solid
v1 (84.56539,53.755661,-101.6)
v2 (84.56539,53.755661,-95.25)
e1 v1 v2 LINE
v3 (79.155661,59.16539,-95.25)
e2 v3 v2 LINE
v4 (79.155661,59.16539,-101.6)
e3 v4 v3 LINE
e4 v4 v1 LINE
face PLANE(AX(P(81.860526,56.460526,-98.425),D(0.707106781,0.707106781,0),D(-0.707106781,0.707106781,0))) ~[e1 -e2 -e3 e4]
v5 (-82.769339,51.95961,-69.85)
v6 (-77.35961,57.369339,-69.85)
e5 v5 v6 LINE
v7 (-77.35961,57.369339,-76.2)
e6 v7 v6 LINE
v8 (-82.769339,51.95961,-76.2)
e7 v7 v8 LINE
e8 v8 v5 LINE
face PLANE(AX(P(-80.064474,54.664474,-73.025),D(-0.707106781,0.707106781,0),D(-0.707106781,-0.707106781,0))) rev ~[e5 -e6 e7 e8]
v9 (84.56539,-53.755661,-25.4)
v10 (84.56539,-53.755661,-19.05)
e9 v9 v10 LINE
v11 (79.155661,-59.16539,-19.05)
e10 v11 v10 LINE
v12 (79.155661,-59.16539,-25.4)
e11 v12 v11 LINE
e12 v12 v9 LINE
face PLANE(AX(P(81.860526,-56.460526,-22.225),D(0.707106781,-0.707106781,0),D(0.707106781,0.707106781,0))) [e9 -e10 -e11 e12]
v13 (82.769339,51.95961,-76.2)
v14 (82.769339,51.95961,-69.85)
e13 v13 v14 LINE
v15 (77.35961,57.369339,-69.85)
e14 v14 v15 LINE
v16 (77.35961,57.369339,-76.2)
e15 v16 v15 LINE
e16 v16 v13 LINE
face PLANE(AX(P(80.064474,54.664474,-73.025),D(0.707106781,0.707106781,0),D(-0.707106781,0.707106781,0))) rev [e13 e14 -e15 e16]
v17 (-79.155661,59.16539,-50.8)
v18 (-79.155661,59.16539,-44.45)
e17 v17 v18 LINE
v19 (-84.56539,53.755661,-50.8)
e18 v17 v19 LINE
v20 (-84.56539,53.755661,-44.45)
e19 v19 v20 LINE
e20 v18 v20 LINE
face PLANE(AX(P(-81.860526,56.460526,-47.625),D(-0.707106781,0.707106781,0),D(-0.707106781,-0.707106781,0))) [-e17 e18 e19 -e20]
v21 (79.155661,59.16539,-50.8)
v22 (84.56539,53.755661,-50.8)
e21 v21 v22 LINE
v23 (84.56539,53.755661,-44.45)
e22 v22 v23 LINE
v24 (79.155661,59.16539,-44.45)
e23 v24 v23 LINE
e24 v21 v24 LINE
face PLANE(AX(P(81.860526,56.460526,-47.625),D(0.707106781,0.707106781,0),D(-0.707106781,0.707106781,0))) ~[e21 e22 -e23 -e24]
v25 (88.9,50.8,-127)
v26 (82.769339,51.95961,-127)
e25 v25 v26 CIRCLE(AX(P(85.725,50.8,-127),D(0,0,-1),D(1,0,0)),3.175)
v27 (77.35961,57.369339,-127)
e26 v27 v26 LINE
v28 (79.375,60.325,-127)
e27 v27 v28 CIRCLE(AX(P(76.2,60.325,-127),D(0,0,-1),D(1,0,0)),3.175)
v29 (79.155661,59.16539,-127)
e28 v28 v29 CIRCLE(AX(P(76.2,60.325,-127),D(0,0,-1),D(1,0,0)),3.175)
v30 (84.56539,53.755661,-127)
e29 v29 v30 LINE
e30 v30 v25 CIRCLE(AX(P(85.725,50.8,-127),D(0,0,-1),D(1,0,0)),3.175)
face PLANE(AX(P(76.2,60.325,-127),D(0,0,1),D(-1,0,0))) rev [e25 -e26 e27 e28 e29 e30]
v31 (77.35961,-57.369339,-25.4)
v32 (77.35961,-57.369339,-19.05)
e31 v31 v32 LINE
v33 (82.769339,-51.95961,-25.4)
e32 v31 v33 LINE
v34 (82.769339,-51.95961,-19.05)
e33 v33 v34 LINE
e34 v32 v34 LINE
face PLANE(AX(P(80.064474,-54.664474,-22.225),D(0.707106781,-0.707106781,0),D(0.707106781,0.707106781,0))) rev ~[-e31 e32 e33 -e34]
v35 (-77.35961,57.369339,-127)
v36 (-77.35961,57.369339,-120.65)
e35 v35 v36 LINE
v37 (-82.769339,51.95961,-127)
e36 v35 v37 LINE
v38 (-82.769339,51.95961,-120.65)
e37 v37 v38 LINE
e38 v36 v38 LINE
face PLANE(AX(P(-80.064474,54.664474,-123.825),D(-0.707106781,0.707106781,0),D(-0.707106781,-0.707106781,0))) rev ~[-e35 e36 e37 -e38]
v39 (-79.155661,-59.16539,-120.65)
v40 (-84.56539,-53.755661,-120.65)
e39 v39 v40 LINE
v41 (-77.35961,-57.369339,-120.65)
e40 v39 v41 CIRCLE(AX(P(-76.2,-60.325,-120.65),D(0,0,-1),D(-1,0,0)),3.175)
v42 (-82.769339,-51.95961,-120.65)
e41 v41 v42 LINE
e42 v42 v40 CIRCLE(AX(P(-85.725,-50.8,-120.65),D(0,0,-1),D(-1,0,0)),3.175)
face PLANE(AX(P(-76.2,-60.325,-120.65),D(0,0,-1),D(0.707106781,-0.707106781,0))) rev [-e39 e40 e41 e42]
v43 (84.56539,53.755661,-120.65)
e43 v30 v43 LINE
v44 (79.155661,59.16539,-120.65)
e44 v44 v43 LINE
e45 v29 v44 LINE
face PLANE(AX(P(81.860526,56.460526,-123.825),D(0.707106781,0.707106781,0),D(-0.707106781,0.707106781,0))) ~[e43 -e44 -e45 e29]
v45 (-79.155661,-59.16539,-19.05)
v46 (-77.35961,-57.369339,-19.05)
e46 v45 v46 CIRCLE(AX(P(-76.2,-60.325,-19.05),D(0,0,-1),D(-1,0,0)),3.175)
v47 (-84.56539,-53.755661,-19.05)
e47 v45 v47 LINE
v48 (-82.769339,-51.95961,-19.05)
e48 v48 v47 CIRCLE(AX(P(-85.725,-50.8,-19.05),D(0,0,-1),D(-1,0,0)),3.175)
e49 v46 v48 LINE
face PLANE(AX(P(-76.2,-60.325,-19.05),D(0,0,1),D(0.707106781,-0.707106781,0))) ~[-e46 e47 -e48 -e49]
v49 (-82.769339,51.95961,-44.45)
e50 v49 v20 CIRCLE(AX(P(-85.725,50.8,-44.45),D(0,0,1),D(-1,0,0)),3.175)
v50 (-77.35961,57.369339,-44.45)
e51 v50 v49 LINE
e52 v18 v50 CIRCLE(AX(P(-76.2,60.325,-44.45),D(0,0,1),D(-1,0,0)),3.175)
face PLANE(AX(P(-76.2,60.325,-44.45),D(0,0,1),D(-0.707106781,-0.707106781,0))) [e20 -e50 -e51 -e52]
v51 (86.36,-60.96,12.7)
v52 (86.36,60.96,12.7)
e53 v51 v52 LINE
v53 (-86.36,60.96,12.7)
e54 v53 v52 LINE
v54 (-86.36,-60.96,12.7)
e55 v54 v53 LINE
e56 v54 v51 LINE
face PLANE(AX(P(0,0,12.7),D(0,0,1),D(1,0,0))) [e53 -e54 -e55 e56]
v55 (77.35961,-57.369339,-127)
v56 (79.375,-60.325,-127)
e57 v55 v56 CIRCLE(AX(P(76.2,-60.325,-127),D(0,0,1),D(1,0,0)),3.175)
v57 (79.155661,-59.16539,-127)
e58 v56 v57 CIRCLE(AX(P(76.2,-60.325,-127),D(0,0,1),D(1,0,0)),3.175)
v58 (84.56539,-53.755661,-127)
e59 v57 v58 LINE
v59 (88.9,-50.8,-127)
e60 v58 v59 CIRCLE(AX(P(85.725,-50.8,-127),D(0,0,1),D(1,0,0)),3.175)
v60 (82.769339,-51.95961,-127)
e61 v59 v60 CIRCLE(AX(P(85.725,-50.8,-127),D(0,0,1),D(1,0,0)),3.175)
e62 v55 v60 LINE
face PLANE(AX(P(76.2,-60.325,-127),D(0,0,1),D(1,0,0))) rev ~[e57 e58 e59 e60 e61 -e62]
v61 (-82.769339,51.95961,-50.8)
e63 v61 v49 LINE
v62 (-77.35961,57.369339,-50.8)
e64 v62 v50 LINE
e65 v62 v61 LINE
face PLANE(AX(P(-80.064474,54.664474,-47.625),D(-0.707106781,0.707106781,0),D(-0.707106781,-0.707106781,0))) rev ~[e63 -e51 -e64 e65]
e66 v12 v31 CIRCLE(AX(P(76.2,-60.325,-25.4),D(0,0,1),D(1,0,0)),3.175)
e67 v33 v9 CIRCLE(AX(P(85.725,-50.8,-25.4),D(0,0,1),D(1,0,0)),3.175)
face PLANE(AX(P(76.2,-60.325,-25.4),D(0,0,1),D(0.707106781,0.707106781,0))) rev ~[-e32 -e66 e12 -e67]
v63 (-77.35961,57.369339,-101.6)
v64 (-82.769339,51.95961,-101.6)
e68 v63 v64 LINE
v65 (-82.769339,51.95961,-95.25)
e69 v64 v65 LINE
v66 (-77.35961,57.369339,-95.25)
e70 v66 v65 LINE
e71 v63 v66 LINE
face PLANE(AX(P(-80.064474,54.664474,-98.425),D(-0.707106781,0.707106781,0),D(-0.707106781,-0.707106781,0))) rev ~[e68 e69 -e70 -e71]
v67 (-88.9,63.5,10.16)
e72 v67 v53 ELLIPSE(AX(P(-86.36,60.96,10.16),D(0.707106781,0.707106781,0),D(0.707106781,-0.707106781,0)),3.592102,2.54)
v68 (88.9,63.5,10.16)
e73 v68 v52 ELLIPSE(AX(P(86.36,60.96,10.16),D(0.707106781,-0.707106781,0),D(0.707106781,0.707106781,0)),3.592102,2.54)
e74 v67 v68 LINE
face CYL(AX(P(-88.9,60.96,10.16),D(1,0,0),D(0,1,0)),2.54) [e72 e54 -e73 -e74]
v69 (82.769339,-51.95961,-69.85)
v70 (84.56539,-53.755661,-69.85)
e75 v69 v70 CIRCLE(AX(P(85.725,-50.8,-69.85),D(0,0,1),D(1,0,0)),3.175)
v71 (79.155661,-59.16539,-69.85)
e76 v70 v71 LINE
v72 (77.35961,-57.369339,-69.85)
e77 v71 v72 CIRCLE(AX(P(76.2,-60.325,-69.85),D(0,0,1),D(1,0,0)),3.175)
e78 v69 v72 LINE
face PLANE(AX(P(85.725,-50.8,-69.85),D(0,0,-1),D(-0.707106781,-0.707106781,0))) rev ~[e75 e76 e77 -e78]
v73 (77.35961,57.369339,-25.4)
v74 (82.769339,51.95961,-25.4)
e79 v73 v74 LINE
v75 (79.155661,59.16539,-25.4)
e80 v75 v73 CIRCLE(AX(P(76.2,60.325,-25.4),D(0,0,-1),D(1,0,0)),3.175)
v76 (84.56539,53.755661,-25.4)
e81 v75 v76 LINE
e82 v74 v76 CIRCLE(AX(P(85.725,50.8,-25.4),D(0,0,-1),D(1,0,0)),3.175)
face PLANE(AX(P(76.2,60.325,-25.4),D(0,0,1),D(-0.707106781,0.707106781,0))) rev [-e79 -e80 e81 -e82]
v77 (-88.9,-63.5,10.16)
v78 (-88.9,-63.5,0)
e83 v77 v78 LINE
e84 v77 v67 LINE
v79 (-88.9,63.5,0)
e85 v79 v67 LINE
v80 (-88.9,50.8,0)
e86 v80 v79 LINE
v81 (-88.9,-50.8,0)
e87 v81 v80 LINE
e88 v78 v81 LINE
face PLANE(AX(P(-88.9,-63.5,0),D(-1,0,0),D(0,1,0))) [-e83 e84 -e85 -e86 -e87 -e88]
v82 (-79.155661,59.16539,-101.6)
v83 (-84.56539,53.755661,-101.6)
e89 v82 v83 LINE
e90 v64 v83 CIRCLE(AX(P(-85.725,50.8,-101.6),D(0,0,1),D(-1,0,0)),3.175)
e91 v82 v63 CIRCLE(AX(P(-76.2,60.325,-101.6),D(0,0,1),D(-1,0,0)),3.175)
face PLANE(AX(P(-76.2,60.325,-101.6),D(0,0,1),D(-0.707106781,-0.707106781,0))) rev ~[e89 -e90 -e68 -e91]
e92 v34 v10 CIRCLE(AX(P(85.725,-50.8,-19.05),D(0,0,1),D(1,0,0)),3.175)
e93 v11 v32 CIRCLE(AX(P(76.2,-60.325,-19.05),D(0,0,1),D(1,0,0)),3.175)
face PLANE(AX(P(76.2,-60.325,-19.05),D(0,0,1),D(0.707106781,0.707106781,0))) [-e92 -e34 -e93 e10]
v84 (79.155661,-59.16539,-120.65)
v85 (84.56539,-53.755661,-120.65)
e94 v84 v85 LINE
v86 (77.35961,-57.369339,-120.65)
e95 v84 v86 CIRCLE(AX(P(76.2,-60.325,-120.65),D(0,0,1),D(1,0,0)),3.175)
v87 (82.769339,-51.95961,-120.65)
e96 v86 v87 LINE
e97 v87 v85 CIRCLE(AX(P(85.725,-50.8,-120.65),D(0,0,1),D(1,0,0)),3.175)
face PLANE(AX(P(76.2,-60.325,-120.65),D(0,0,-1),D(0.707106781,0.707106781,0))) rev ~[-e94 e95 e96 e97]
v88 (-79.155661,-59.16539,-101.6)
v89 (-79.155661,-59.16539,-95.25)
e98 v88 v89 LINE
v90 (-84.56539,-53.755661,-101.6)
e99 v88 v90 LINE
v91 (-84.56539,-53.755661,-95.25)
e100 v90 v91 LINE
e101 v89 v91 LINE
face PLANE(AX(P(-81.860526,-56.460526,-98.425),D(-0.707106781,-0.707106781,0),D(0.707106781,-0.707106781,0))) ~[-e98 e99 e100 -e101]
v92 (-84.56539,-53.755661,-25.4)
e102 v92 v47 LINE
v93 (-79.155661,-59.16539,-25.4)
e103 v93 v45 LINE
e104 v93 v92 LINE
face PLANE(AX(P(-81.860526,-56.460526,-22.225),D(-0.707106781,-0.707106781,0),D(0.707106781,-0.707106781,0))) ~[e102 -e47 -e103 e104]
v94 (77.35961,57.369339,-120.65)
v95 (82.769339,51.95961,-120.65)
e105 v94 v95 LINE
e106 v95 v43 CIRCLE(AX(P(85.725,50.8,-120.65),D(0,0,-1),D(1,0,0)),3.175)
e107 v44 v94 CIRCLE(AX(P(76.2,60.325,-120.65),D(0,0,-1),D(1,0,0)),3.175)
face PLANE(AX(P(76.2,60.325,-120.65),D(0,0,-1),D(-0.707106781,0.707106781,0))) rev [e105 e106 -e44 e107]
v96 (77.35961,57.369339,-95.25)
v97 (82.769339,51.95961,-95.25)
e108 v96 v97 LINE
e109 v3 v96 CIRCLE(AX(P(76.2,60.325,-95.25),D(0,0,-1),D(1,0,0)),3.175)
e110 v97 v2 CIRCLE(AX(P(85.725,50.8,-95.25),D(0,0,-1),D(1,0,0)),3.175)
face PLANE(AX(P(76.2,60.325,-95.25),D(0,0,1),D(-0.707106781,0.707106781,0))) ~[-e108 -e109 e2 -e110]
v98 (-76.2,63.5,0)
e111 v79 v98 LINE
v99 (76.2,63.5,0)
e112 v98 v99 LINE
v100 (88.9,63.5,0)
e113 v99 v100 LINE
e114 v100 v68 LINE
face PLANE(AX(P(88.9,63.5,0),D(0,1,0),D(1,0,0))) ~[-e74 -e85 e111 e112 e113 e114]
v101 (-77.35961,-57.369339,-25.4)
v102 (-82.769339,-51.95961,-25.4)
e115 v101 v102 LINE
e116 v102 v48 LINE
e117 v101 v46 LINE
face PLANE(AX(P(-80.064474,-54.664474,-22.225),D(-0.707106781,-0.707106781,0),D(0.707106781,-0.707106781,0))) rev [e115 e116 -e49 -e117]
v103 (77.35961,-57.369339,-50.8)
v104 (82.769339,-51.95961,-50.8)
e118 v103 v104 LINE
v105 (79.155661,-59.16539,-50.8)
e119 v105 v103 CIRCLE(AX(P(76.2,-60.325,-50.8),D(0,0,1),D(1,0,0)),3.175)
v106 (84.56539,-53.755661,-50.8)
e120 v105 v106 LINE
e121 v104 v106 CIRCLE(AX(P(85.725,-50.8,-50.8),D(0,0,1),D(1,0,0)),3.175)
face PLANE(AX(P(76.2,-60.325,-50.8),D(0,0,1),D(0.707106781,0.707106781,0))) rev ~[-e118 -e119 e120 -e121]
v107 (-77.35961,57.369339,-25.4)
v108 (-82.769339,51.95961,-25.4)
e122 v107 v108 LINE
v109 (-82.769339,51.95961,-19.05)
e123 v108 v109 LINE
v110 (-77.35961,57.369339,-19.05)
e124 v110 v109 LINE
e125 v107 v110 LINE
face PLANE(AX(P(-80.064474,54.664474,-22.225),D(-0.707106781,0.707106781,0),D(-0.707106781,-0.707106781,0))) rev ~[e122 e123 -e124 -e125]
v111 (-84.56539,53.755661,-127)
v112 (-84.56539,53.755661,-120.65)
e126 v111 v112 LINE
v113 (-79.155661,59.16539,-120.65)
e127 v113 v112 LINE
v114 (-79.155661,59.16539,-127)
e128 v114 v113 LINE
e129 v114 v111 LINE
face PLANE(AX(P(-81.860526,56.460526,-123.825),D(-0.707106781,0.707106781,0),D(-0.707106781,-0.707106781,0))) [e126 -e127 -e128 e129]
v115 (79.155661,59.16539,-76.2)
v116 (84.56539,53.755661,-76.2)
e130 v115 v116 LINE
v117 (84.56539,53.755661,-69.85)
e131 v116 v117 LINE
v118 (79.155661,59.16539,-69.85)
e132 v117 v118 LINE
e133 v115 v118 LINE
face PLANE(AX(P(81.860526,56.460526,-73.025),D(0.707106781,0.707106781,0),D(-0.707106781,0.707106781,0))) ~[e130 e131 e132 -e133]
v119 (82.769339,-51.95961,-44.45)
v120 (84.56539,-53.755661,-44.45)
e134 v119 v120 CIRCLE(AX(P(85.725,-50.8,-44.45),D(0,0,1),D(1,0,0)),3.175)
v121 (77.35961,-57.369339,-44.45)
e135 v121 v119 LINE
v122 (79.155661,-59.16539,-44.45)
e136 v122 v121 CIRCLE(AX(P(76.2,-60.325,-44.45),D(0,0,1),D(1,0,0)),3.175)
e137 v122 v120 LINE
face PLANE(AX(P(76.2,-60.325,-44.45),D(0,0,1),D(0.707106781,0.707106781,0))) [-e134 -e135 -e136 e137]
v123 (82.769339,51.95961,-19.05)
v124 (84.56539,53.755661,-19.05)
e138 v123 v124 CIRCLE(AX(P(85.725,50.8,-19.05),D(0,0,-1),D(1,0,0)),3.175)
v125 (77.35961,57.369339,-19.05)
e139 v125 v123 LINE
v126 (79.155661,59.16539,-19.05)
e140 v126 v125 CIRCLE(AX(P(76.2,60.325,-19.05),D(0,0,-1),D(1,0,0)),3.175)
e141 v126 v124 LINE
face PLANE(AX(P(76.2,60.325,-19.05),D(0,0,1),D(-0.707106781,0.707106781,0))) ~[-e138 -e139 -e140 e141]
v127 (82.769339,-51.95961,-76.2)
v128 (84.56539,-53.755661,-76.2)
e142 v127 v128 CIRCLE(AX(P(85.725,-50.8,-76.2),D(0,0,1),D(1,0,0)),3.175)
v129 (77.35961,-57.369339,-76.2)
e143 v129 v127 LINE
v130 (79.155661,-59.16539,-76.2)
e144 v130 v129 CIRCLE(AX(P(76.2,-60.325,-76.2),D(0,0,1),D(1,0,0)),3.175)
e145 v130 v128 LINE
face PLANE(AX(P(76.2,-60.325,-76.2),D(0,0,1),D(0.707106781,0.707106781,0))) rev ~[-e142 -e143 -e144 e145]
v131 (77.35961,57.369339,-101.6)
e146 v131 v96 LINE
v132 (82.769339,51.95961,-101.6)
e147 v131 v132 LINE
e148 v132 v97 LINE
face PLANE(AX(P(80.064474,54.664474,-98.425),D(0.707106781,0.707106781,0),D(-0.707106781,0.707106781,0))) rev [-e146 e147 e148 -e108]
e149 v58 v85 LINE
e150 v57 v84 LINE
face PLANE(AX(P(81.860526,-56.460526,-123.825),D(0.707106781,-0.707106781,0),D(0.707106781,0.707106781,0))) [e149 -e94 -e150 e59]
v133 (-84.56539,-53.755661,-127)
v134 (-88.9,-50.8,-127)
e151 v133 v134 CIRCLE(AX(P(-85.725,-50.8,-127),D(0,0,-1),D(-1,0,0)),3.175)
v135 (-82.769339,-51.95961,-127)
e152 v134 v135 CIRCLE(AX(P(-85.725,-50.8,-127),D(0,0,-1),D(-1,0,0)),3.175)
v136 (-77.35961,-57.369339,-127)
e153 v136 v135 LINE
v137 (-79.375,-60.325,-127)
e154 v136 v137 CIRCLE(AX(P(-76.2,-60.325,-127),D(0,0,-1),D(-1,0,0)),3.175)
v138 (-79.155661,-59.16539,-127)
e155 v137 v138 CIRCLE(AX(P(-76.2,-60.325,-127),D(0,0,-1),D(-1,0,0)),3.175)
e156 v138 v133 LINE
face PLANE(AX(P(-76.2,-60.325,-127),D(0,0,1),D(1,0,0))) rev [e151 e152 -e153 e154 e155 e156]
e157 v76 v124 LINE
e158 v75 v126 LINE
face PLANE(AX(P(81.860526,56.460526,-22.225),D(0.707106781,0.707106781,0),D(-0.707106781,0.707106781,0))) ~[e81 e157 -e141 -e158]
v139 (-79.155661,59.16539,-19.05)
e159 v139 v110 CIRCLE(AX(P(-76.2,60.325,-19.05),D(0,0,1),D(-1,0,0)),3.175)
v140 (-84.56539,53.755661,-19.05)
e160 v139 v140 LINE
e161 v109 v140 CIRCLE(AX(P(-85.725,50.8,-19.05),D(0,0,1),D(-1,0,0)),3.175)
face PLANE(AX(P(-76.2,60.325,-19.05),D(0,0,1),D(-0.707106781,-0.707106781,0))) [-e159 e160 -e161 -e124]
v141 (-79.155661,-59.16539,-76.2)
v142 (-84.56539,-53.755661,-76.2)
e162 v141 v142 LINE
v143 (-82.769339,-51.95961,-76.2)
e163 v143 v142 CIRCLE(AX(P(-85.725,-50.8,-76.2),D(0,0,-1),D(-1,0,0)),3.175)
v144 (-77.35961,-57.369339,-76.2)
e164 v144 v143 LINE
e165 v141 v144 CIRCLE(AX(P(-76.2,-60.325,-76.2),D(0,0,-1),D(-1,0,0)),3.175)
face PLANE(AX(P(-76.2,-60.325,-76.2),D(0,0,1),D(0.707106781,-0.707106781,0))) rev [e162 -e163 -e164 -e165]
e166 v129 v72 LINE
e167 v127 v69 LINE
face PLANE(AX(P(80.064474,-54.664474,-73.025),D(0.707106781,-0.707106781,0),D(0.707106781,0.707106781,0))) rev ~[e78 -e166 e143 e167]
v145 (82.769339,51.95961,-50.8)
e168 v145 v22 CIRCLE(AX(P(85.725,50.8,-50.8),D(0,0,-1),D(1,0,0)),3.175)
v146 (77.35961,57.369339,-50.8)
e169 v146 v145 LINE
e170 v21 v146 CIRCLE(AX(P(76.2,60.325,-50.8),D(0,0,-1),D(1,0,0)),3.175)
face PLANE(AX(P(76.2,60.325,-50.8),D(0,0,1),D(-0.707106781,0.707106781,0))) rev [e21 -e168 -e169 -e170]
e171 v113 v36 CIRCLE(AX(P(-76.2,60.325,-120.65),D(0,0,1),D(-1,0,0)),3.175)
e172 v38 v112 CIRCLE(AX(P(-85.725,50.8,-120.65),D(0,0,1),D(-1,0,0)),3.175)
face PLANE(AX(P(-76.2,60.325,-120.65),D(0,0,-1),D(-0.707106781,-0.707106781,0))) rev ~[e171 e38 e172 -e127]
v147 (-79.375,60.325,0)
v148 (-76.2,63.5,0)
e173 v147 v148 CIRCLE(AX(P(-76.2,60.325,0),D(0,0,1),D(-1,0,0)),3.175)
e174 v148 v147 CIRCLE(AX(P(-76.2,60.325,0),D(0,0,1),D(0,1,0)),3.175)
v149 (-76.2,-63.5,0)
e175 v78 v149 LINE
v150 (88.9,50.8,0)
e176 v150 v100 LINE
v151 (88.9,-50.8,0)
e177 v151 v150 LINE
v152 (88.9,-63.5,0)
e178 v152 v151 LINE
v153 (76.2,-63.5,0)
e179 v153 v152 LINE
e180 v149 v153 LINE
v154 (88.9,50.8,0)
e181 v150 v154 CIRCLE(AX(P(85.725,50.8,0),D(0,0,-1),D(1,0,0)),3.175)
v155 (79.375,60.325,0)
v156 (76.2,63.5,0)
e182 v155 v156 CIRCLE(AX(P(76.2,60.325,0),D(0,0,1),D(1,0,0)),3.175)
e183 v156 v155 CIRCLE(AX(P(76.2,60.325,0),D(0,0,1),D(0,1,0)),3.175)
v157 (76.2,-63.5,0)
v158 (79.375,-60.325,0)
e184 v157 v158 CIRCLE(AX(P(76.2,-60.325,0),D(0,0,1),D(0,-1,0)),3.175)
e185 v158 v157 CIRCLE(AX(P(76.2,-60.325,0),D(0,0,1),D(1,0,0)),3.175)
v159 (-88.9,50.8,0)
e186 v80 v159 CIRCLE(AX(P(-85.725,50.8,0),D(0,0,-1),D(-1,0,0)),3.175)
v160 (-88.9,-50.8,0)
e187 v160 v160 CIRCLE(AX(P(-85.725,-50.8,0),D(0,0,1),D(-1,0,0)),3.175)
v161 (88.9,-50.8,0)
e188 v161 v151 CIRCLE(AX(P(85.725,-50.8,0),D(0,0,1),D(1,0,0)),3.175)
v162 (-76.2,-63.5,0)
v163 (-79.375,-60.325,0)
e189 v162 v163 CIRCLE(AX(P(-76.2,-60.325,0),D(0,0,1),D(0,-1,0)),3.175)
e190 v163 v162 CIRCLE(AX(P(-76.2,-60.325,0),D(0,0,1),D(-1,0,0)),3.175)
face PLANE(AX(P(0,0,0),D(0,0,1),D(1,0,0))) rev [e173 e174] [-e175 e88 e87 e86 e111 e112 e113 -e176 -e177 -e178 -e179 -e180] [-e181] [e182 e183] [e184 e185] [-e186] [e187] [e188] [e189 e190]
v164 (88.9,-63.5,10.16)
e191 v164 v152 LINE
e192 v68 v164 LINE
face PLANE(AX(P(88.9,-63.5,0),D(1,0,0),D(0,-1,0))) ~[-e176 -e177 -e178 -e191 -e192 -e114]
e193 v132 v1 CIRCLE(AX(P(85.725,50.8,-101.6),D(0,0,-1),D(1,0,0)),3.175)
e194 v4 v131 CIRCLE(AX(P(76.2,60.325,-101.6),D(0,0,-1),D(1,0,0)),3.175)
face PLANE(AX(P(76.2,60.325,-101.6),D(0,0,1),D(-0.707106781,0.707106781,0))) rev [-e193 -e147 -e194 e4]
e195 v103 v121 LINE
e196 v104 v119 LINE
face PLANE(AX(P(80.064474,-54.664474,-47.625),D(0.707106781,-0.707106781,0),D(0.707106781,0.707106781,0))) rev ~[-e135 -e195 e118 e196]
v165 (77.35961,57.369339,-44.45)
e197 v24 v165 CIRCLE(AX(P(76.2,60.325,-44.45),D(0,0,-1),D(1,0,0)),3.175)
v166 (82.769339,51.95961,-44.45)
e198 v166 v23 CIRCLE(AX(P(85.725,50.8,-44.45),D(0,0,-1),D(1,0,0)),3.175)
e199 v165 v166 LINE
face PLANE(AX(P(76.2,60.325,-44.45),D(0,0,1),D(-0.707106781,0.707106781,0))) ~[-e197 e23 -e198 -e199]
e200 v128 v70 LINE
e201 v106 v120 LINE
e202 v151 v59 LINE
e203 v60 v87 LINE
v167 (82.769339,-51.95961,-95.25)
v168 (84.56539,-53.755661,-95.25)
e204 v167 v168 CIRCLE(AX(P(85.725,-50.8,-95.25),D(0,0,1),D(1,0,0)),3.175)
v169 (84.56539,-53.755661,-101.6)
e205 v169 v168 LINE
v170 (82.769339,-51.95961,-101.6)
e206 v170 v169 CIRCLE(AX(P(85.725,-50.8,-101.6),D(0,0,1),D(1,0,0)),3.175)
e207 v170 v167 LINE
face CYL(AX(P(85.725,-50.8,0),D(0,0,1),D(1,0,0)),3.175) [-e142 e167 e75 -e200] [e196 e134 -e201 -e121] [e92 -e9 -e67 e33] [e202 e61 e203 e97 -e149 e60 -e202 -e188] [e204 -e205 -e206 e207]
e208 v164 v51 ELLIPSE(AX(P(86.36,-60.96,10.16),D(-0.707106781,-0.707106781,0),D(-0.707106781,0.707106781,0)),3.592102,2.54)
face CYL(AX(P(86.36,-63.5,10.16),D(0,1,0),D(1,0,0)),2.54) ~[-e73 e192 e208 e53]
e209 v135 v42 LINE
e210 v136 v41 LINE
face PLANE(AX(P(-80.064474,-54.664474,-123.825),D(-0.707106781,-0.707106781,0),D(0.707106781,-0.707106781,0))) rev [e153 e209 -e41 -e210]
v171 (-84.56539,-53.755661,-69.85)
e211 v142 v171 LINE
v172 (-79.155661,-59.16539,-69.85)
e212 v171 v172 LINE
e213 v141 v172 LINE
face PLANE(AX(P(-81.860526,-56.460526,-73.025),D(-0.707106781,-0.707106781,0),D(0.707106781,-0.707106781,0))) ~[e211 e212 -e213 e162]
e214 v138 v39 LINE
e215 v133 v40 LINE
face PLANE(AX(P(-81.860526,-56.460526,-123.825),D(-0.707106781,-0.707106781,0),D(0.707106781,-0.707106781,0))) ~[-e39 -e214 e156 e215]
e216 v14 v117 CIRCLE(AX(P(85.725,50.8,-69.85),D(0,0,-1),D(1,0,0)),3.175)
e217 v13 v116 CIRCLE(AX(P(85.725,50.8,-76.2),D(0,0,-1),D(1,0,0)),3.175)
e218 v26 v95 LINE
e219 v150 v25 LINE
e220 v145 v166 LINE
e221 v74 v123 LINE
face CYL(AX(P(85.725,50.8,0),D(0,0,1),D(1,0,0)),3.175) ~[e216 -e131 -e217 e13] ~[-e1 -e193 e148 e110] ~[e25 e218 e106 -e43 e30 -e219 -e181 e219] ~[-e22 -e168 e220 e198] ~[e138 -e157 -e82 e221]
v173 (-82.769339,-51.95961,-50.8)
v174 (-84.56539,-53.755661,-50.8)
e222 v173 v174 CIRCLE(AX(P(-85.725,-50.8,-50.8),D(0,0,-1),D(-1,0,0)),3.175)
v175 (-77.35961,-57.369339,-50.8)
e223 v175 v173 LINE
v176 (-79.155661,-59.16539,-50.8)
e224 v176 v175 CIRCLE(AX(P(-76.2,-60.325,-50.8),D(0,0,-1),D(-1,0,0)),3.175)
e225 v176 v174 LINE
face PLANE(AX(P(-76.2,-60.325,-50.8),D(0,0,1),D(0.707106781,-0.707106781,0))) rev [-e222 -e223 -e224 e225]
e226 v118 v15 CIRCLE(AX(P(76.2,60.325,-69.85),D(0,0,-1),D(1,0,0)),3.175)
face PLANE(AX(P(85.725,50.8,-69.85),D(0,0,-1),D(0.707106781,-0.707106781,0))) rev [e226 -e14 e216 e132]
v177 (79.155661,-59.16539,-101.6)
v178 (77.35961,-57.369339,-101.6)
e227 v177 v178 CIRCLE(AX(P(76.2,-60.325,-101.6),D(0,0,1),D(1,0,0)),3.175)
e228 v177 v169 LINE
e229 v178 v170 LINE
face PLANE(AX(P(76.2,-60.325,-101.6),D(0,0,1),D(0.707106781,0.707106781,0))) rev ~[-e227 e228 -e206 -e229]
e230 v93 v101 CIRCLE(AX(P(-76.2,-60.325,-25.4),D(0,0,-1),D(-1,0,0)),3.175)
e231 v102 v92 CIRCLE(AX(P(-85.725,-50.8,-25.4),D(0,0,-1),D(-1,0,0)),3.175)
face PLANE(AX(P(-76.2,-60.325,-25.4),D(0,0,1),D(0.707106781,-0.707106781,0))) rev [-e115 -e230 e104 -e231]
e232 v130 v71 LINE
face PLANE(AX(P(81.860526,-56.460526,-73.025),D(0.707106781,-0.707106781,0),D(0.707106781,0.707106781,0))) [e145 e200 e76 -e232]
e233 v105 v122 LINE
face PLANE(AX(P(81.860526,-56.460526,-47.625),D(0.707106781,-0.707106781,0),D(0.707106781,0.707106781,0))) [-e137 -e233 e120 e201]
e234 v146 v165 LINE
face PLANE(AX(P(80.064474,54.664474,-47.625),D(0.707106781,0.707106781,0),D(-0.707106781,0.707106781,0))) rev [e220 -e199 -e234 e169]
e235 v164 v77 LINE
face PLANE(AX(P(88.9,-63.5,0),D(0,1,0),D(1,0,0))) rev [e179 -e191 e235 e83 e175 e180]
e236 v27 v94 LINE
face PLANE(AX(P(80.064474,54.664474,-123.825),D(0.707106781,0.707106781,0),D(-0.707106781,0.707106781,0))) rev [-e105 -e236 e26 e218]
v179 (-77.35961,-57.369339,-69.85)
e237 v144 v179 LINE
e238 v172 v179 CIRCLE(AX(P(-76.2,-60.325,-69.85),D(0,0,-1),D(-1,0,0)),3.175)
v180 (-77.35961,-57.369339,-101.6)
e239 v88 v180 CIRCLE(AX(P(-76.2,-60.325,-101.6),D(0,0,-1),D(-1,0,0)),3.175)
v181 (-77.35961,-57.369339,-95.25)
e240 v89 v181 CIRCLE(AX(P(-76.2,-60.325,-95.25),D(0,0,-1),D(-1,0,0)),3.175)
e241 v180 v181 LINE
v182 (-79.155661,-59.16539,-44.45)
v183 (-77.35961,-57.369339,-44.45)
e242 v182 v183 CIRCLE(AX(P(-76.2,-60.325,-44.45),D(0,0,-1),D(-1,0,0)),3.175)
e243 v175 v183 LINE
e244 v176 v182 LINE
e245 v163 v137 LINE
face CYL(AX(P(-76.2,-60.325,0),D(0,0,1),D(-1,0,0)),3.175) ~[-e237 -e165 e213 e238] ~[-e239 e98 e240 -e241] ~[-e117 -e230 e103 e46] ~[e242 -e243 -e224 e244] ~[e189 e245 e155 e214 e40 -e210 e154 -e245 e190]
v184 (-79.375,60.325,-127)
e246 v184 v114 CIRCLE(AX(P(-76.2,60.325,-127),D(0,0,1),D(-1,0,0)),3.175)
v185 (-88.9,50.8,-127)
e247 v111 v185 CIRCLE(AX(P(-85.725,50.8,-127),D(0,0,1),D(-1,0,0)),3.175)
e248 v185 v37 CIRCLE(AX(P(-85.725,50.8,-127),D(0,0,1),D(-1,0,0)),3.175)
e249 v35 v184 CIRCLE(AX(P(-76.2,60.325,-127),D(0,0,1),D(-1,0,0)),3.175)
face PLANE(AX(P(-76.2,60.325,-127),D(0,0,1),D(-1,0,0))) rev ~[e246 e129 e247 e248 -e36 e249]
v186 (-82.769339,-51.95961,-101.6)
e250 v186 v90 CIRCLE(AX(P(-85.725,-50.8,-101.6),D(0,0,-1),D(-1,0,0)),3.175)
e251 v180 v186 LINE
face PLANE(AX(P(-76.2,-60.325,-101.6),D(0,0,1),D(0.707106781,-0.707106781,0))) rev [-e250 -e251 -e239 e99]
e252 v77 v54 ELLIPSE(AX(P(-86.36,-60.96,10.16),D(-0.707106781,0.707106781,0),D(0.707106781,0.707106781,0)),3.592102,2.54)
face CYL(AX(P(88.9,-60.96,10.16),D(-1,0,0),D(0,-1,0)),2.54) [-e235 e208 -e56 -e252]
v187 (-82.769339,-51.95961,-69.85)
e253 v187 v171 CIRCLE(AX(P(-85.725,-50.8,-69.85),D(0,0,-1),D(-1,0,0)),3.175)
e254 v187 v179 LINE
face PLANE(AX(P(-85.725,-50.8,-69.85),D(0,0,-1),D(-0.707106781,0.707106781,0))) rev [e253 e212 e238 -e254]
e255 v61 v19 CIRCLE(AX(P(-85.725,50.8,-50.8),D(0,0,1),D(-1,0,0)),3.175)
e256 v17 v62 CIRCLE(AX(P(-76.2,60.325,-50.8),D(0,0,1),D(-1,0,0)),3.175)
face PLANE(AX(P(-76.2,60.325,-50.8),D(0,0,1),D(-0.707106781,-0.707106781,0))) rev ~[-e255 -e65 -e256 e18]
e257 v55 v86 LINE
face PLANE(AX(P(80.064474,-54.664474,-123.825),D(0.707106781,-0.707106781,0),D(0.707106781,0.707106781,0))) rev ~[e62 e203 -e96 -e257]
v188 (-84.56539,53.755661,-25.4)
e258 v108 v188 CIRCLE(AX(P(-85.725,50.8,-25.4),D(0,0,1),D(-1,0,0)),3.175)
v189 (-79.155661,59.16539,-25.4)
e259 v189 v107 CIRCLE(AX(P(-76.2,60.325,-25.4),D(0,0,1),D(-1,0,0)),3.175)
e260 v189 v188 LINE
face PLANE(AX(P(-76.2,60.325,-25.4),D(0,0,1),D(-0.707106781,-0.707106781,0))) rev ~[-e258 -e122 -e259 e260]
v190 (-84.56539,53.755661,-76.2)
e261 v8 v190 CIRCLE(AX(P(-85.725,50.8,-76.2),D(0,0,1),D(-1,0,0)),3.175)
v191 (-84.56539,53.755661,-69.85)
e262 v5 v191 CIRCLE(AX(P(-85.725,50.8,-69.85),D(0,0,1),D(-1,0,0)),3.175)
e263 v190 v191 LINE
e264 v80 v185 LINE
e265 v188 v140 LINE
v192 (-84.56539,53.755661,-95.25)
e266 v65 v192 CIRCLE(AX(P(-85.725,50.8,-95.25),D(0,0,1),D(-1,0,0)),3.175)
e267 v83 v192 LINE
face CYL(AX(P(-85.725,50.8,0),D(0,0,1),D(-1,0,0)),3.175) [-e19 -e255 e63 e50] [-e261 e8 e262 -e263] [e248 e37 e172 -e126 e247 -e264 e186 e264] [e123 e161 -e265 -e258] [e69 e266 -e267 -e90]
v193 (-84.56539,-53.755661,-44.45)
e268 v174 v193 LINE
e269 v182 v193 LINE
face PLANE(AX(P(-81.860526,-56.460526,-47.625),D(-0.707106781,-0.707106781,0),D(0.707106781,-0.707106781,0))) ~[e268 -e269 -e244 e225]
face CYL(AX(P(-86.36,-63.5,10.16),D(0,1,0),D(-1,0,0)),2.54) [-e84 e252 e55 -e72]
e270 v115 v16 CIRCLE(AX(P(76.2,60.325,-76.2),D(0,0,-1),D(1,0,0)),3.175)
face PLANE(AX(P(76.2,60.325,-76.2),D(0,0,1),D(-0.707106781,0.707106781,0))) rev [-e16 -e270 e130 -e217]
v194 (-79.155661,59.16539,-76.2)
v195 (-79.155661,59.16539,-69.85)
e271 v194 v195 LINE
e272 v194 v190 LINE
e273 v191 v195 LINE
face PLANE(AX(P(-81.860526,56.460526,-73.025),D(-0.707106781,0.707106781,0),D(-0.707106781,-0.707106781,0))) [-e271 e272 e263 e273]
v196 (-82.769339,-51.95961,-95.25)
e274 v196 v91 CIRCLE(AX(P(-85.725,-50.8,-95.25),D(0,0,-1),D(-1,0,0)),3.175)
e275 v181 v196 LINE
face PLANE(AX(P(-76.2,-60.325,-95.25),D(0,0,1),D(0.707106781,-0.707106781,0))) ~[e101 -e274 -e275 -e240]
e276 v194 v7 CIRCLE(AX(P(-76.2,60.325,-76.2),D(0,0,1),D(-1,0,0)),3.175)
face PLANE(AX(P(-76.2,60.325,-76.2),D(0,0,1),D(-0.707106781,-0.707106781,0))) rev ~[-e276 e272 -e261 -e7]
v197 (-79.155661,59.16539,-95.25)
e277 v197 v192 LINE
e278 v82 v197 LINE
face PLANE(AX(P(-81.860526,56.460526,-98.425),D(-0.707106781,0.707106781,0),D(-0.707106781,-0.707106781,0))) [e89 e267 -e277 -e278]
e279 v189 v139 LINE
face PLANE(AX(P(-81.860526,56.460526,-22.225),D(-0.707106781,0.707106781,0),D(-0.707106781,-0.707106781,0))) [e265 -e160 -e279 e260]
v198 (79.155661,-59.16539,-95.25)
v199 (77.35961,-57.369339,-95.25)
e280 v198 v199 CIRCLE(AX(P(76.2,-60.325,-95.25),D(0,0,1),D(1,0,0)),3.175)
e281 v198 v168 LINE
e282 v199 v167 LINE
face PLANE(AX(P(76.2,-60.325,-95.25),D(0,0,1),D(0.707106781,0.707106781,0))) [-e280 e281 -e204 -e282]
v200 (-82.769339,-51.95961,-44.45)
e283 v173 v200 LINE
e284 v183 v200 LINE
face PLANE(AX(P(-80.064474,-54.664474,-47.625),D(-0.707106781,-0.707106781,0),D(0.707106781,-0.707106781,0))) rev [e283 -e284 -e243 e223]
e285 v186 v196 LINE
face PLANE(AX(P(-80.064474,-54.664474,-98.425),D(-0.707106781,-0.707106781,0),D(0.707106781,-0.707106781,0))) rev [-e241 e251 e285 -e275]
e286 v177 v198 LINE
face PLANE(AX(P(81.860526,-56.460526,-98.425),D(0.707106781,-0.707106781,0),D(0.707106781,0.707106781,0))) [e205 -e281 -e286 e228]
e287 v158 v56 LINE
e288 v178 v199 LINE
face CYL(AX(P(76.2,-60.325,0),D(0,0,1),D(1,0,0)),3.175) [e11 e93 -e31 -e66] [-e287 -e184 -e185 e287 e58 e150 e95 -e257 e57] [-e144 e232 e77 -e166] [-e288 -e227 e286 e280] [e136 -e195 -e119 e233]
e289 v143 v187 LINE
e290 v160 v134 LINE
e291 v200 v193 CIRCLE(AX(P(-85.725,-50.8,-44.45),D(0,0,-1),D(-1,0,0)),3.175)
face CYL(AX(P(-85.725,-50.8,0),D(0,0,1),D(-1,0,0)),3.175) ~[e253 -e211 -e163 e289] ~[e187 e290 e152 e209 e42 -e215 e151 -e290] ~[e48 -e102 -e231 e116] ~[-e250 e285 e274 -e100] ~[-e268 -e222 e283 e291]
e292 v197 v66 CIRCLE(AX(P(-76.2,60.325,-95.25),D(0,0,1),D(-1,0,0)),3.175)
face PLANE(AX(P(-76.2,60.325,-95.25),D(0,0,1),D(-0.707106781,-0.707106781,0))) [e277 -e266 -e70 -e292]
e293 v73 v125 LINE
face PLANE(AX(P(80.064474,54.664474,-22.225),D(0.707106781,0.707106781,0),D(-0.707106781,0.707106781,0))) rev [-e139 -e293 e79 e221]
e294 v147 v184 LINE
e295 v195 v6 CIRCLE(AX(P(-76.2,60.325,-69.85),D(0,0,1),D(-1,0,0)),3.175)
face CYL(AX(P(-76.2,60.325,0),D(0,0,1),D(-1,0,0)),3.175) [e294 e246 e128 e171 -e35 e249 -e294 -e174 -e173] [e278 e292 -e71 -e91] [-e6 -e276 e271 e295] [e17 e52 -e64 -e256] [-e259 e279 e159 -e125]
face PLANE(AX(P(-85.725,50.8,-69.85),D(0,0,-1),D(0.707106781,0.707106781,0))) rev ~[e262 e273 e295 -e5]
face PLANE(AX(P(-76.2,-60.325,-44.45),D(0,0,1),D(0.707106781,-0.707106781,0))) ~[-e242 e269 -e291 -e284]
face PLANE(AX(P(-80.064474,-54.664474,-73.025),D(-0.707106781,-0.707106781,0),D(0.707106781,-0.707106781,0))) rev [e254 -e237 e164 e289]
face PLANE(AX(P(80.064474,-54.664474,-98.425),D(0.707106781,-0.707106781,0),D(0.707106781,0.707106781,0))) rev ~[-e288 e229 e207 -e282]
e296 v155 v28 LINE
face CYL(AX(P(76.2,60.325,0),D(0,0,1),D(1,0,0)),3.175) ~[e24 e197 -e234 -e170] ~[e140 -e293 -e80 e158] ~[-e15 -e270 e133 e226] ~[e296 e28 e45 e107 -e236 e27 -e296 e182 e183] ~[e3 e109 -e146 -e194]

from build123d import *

# Parameters (mm, degrees)
F0_W         = 177.8
F0_H         = 127
F1_DEPTH     = 12.7
F2_R         = 3.175
F3_DEPTH     = 127
F6_W         = 13.4703841816
F6_H         = 6.35
F7_DEPTH     = 1.27
F8_R         = 2.54
F9_T1_DEPTH  = 10.16
F9_T3_DEPTH  = 7.62
F9_T5_DEPTH  = 10.1599999705
F9_S9_W      = 2.54
F9_S9_H      = 2.54
F9_T10_DEPTH = 2.54
F9_S15_W     = 2.54
F9_S15_H     = 2.54
F9_T16_DEPTH = 2.54
F9_T22_DEPTH = 171.4500000295
F9_S23_R     = 3.175
F9_T24_DEPTH = 87
F9_T28_DEPTH = 120.65
F9_S29_R     = 3.175
F9_T30_DEPTH = 62


# Not quite as in the source:
# - a fillet or chamfer that OpenCascade refuses, or shapes differently, is made with other operations: its cross-section is extruded or revolved along the edge and cut away or added


with BuildPart() as f1:
    # F0 (on Top) → F1 (new body)
    with BuildSketch(Plane.XY):
        Rectangle(F0_W, F0_H)
    extrude(amount=F1_DEPTH)

    # F2 (on Top) → F3 (join)
    with BuildSketch(Plane.XY):
        with Locations((76.2, -60.325)):
            Circle(F2_R)
        with Locations((85.725, -50.8)):
            Circle(F2_R)
    extrude(amount=-F3_DEPTH)

    # F6 (on face) → F7 (join, symmetric)
    with BuildSketch(Plane(origin=(68.2625, -68.2625, 0), x_dir=(0.7071067812, 0.7071067812, 0), z_dir=(0.7071067812, -0.7071067812, 0))):
        with Locations((17.9605122421, -22.225)):
            Rectangle(F6_W, F6_H)
        with Locations((17.9605122421, -47.625)):
            Rectangle(F6_W, F6_H)
        Polygon((11.2253201513, -76.2), (24.6957043329, -76.2), (24.6957043329, -69.85), (11.2336926315, -69.85), (11.2253201513, -69.85), align=None)
        with Locations((17.9605122421, -98.425)):
            Rectangle(F6_W, F6_H)
        with Locations((17.9605122421, -123.825)):
            Rectangle(F6_W, F6_H)
    extrude(amount=F7_DEPTH, both=True)

    # F8
    f8_edges = [f1.edges().sort_by_distance(p)[0] for p in [
        (0, -63.5, 12.7),
        (88.9, 0, 12.7),
        (0, 63.5, 12.7),
        (-88.9, 0, 12.7),
    ]]
    fillet(f8_edges, radius=F8_R)

    # F9: fillet of radius 2.54 on 3 edges, made by hand

    # F9_s2 → F9_t1 (cut)
    with BuildSketch(Plane.XZ.offset(50.8)):
        with BuildLine():
            ThreePointArc((86.36, 0), (88.1560512242, 0.7439487758), (88.9, 2.54))
            Line((88.9, 2.54), (88.9, 0))
            Line((88.9, 0), (86.36, 0))
        make_face()
    extrude(amount=F9_T1_DEPTH, mode=Mode.SUBTRACT)

    # F9_s4 → F9_t3 (cut)
    with BuildSketch(Plane.XY.offset(2.54)):
        with BuildLine():
            ThreePointArc((86.36, -63.5), (88.1560512242, -62.7560512242), (88.9, -60.96))
            Line((88.9, -60.96), (88.9, -63.5))
            Line((88.9, -63.5), (86.36, -63.5))
        make_face()
    extrude(amount=F9_T3_DEPTH, mode=Mode.SUBTRACT)

    # F9_s6 → F9_t5 (cut)
    with BuildSketch(Plane.YZ.offset(76.2000000295)):
        with BuildLine():
            ThreePointArc((-63.5, 2.54), (-62.7560512242, 0.7439487758), (-60.96, 0))
            Line((-60.96, 0), (-63.5, 0))
            Line((-63.5, 0), (-63.5, 2.54))
        make_face()
    extrude(amount=F9_T5_DEPTH, mode=Mode.SUBTRACT)


with BuildPart() as f9_tool8:
    # F9_s9 → F9_t10 (new body)
    with BuildSketch(Plane.XZ.offset(60.96)):
        with Locations((87.63, 11.43)):
            Rectangle(F9_S9_W, F9_S9_H)
    extrude(amount=F9_T10_DEPTH)

    # F9_s11 → F9_t12 (revolve, cut)
    with BuildSketch(Plane(origin=(86.36, -60.96, 10.16), x_dir=(-0.7071067812, 0, -0.7071067812), z_dir=(-0.7071067812, 0, 0.7071067812))):
        with BuildLine():
            ThreePointArc((0, -2.54), (2.54, 0), (0, 2.54))
            Line((0, 2.54), (0, -2.54))
        make_face()
    revolve(axis=Axis((86.36, -60.96, 10.16), (0, -1, 0)), mode=Mode.SUBTRACT)


with BuildPart() as f1_1:
    add(f1.part)

    # F9_t7: cut F9_tool8
    add(f9_tool8.part, mode=Mode.SUBTRACT)


with BuildPart() as f9_tool14:
    # F9_s15 → F9_t16 (new body)
    with BuildSketch(Plane.XZ.offset(60.96)):
        with Locations((87.63, 1.27)):
            Rectangle(F9_S15_W, F9_S15_H)
    extrude(amount=F9_T16_DEPTH)

    # F9_s17 → F9_t18 (revolve, cut)
    with BuildSketch(Plane(origin=(86.36, -60.96, 2.54), x_dir=(-0.7071067812, 0, 0.7071067812), z_dir=(0.7071067812, 0, 0.7071067812))):
        with BuildLine():
            ThreePointArc((0, -2.54), (2.54, 0), (0, 2.54))
            Line((0, 2.54), (0, -2.54))
        make_face()
    revolve(axis=Axis((86.36, -60.96, 2.54), (0, -1, 0)), mode=Mode.SUBTRACT)


with BuildPart() as f1_2:
    add(f1_1.part)

    # F9_t13: cut F9_tool14
    add(f9_tool14.part, mode=Mode.SUBTRACT)


with BuildPart() as f9_tool20:
    # F9_s21 → F9_t22 (new body)
    with BuildSketch(Plane.YZ.offset(-95.25)):
        with BuildLine():
            ThreePointArc((-63.5, 2.54), (-62.7560512242, 0.7439487758), (-60.96, 0))
            Line((-60.96, 0), (-63.5, 0))
            Line((-63.5, 0), (-63.5, 2.54))
        make_face()
    extrude(amount=F9_T22_DEPTH)

    # F9_s23 → F9_t24 (cut, symmetric)
    with BuildSketch(Plane.XY.offset(1.3)):
        with Locations((76.2, -60.325)):
            Circle(F9_S23_R)
    extrude(amount=F9_T24_DEPTH, both=True, mode=Mode.SUBTRACT)


with BuildPart() as f1_3:
    add(f1_2.part)

    # F9_t19: cut F9_tool20
    add(f9_tool20.part, mode=Mode.SUBTRACT)


with BuildPart() as f9_tool26:
    # F9_s27 → F9_t28 (new body)
    with BuildSketch(Plane.XZ.offset(50.8)):
        with BuildLine():
            ThreePointArc((86.36, 0), (88.1560512242, 0.7439487758), (88.9, 2.54))
            Line((88.9, 2.54), (88.9, 0))
            Line((88.9, 0), (86.36, 0))
        make_face()
    extrude(amount=-F9_T28_DEPTH)

    # F9_s29 → F9_t30 (cut, symmetric)
    with BuildSketch(Plane.XY.offset(1.3)):
        with Locations((85.725, -50.8)):
            Circle(F9_S29_R)
    extrude(amount=F9_T30_DEPTH, both=True, mode=Mode.SUBTRACT)


with BuildPart() as f1_4:
    add(f1_3.part)

    # F9_t25: cut F9_tool26
    add(f9_tool26.part, mode=Mode.SUBTRACT)

    # F10: F1 across plane


with BuildPart() as f1_5:
    add(f1_4.part)
    add(f1_4.part.mirror(Plane.YZ))

    # F11: F1 across plane


with BuildPart() as f1_6:
    add(f1_5.part)
    add(f1_5.part.mirror(Plane.XZ))


solid = f1_6.part
